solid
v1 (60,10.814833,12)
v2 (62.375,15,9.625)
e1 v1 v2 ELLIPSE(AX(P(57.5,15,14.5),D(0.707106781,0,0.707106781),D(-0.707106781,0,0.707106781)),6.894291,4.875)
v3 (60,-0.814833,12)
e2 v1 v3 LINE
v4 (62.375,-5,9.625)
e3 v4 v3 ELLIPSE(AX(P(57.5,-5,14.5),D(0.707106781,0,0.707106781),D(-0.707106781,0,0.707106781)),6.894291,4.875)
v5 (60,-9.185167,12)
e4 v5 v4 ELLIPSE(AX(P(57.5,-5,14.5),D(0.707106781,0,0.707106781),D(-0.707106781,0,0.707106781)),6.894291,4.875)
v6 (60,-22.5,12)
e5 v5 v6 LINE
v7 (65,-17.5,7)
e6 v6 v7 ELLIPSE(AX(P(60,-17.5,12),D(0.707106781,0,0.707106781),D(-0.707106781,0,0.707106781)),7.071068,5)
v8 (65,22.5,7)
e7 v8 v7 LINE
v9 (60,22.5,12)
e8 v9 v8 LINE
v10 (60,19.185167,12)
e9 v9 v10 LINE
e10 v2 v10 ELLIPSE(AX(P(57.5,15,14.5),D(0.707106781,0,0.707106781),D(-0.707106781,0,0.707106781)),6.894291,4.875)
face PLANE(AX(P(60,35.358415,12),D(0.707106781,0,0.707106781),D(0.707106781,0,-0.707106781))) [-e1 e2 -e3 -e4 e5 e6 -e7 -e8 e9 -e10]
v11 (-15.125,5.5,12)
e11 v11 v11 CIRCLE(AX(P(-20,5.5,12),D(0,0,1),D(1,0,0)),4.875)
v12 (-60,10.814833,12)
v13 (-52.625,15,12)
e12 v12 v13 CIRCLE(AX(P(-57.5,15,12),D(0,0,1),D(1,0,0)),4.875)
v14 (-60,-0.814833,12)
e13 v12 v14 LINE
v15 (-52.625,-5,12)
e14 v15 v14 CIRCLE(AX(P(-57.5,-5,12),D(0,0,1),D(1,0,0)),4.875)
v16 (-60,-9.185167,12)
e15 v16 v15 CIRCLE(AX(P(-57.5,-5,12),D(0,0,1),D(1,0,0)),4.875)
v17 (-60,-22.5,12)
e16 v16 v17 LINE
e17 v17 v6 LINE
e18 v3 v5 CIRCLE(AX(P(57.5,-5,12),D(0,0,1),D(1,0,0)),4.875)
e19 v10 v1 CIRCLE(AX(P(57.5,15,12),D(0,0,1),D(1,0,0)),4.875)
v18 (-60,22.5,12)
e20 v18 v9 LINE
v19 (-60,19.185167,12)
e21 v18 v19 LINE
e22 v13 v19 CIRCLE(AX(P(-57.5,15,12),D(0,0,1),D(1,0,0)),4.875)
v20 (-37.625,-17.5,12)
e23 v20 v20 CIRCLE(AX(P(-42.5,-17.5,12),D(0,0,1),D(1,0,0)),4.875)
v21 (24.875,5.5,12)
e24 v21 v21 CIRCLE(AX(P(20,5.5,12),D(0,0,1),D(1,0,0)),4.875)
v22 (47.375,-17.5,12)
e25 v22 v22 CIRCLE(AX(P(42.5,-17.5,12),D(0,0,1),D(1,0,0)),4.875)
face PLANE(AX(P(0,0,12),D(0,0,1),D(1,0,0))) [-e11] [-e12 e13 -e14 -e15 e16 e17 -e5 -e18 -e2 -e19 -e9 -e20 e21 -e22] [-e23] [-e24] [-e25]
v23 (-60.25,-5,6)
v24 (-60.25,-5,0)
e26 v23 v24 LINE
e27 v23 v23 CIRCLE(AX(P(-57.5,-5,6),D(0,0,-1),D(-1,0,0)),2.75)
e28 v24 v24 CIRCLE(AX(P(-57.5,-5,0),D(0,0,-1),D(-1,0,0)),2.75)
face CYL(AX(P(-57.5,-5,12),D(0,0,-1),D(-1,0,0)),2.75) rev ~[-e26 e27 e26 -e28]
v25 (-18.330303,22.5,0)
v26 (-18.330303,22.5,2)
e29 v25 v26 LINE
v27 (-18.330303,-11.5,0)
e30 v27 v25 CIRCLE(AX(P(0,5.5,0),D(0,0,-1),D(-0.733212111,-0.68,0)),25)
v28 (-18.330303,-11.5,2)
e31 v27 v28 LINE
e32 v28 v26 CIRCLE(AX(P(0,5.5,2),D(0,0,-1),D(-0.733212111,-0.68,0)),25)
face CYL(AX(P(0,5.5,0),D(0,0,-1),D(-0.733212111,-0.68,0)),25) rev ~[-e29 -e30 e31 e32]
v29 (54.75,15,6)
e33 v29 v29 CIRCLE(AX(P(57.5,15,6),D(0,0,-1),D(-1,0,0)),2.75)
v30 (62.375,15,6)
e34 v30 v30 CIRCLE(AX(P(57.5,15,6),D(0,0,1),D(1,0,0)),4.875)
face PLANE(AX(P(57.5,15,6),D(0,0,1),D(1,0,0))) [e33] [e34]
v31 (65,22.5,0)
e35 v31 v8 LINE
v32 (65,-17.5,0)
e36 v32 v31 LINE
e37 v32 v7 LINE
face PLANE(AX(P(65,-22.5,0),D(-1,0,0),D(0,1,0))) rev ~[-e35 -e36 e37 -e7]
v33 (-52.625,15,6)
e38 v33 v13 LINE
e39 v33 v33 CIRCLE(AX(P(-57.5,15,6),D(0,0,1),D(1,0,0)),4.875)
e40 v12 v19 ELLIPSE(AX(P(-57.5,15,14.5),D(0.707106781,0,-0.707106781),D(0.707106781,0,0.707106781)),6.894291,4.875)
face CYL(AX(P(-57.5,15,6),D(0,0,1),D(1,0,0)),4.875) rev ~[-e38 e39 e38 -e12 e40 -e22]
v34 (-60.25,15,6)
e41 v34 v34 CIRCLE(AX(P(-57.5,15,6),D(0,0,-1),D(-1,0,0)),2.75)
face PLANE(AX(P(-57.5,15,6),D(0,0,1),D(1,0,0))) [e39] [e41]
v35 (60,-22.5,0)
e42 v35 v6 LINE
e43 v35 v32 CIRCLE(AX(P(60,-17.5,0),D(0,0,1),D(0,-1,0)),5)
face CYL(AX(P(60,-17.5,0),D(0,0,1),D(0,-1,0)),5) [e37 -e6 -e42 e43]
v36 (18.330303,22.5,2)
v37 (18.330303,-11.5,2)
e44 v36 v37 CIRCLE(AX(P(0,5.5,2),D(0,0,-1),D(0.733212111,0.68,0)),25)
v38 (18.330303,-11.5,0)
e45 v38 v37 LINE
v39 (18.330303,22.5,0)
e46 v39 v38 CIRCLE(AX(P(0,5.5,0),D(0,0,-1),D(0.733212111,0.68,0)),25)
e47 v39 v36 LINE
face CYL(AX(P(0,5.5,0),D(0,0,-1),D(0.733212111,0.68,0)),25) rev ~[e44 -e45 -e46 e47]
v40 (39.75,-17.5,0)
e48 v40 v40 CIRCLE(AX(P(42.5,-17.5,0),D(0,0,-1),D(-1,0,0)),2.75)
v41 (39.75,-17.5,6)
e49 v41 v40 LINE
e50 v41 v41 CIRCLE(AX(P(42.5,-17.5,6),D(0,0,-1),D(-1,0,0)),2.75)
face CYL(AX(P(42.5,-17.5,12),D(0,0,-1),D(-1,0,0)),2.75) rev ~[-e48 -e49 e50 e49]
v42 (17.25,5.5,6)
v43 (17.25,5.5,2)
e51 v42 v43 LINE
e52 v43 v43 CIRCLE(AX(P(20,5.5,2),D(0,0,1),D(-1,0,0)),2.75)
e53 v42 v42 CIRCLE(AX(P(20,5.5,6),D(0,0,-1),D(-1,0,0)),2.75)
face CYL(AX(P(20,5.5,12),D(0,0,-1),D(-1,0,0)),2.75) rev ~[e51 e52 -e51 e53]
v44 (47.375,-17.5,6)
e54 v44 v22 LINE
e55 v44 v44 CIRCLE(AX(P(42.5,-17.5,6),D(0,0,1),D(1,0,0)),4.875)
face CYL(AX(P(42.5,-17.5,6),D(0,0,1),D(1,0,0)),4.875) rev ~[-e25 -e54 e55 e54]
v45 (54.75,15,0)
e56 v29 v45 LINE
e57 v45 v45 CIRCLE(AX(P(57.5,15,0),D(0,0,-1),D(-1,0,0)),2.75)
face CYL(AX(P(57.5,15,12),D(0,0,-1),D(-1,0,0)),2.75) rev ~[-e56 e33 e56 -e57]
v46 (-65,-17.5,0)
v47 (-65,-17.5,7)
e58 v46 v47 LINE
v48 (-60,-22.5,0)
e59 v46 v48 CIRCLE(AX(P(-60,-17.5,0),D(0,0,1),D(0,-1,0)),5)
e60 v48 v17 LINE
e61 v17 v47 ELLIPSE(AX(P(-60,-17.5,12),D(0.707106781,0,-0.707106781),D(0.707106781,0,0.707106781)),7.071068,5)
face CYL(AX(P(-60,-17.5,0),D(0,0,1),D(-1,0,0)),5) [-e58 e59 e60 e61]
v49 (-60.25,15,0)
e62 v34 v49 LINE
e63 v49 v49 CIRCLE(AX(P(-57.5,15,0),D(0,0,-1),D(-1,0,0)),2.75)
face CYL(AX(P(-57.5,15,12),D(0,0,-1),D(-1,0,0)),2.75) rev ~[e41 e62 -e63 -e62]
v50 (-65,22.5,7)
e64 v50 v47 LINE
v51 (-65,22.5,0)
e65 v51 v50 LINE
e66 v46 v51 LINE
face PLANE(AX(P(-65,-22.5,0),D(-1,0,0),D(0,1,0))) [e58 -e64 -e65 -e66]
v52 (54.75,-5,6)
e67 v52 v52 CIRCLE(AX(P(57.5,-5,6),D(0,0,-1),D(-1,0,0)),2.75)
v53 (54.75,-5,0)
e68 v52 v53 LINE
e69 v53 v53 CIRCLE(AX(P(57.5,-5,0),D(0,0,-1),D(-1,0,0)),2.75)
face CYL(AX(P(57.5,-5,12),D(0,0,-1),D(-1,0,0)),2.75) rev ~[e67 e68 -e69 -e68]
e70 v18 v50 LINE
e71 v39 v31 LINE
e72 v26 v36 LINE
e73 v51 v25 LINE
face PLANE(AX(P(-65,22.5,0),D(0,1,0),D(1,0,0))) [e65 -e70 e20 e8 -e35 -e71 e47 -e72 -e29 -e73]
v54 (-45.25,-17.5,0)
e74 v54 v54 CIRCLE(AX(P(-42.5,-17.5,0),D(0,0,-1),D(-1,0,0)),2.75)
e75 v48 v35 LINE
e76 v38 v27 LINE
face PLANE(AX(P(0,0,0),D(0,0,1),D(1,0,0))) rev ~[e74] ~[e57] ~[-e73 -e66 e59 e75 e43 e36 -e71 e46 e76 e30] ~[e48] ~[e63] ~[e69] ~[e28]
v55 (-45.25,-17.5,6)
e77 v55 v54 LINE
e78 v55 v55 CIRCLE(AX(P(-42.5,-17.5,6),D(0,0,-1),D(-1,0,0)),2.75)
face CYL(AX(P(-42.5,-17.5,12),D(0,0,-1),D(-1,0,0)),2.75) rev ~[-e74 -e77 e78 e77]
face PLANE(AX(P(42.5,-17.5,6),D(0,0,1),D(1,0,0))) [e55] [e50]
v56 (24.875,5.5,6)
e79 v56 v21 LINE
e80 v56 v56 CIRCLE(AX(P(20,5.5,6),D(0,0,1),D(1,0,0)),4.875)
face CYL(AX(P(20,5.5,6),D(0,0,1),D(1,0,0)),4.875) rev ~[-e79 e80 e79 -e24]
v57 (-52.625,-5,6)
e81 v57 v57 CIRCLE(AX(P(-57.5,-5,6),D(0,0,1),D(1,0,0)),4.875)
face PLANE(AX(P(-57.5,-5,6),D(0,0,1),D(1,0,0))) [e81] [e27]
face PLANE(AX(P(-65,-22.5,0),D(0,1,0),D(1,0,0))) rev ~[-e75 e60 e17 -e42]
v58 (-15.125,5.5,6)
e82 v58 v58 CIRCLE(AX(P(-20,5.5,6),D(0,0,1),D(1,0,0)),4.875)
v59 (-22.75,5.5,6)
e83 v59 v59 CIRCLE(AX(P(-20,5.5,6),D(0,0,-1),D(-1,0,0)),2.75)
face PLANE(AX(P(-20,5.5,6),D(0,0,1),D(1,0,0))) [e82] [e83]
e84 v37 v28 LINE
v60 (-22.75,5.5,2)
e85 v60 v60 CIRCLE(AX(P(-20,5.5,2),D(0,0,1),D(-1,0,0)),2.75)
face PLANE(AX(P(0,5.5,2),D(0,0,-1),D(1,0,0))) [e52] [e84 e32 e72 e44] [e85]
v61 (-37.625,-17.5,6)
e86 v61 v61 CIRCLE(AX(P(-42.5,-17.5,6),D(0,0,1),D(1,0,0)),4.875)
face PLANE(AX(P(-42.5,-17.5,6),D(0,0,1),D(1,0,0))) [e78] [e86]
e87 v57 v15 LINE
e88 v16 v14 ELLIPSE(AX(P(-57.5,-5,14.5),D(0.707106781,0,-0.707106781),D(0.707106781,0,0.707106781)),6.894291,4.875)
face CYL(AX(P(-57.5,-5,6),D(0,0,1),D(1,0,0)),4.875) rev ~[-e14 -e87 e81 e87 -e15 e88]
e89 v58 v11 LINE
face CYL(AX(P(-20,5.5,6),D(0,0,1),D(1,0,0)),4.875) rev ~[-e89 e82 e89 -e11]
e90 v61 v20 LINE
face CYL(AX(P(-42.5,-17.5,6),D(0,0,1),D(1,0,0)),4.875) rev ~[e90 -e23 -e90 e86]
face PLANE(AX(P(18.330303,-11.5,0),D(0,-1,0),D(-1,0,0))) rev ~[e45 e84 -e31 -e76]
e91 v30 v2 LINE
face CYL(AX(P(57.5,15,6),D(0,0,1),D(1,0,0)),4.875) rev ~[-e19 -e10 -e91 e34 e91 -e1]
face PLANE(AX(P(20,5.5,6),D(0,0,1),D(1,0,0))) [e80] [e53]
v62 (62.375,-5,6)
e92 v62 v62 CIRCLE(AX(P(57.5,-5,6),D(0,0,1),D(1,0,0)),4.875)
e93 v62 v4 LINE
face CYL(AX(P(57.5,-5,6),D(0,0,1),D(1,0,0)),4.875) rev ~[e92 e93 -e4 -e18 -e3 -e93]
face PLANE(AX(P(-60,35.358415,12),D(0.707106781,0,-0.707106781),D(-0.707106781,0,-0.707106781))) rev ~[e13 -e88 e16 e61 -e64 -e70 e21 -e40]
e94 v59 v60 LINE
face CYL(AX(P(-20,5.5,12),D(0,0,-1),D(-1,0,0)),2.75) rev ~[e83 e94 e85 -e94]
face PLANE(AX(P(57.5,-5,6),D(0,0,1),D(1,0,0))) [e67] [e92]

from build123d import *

# Parameters (mm, degrees)
F0_W                 = 130
F0_H                 = 45
F1_DEPTH             = 12
F2_R                 = 5
F5_D                 = 5.5
F5_CBORE_D           = 9.75
F5_CBORE_DEPTH       = 6
F5_ON_F4_D           = 5.5
F5_ON_F4_CBORE_D     = 9.75
F5_ON_F4_CBORE_DEPTH = 6
F6_T1_DEPTH          = 65.7168298797
F7_R                 = 2.75
F8_DEPTH             = 2


# Not quite as in the source:
# - a fillet or chamfer that OpenCascade refuses, or shapes differently, is made with other operations: its cross-section is extruded or revolved along the edge and cut away or added


with BuildPart() as f1:
    # F0 (on Top) → F1 (new body)
    with BuildSketch(Plane.XY):
        Rectangle(F0_W, F0_H)
    extrude(amount=F1_DEPTH)

    # F2
    f2_edges = [f1.edges().sort_by_distance(p)[0] for p in [
        (65, -22.5, 6),
        (-65, -22.5, 6),
    ]]
    fillet(f2_edges, radius=F2_R)

    # F5 (through all)
    with Locations(Plane.XY.offset(12)):
        with Locations((-57.5, -5), (-57.5, 15), (57.5, -5), (57.5, 15), (-42.5, -17.5), (42.5, -17.5)):
            CounterBoreHole(F5_D / 2, F5_CBORE_D / 2, F5_CBORE_DEPTH)

    # F5 on F4 (through all)
    with Locations(Plane.XY.offset(12)):
        with Locations((-20, 5.5), (20, 5.5)):
            CounterBoreHole(F5_ON_F4_D / 2, F5_ON_F4_CBORE_D / 2, F5_ON_F4_CBORE_DEPTH)

    # F6: chamfer of 5 on 2 edges, made by hand

    # F6_s2 → F6_t1 (cut)
    with BuildSketch(Plane.XZ.offset(-35.3584149398)):
        Polygon((-60, 12), (-65, 7), (-65, 12), align=None)
        Polygon((60, 12), (65, 7), (65, 12), align=None)
    extrude(amount=F6_T1_DEPTH, mode=Mode.SUBTRACT)

    # F7 (on face) → F8 (cut)
    with BuildSketch(Plane(origin=(0, 0, 0), x_dir=(1, 0, 0), z_dir=(0, 0, -1))):
        with BuildLine():
            Line((-18.3303027798, -22.5), (18.3303027798, -22.5))
            ThreePointArc((18.3303027798, -22.5), (25, -5.5), (18.3303027798, 11.5))
            Line((18.3303027798, 11.5), (-18.3303027798, 11.5))
            ThreePointArc((-18.3303027798, 11.5), (-25, -5.5), (-18.3303027798, -22.5))
        make_face()
        with Locations((-20, -5.5)):
            Circle(F7_R, mode=Mode.SUBTRACT)
        with Locations((20, -5.5)):
            Circle(F7_R, mode=Mode.SUBTRACT)
    extrude(amount=-F8_DEPTH, mode=Mode.SUBTRACT)


solid = f1.part
